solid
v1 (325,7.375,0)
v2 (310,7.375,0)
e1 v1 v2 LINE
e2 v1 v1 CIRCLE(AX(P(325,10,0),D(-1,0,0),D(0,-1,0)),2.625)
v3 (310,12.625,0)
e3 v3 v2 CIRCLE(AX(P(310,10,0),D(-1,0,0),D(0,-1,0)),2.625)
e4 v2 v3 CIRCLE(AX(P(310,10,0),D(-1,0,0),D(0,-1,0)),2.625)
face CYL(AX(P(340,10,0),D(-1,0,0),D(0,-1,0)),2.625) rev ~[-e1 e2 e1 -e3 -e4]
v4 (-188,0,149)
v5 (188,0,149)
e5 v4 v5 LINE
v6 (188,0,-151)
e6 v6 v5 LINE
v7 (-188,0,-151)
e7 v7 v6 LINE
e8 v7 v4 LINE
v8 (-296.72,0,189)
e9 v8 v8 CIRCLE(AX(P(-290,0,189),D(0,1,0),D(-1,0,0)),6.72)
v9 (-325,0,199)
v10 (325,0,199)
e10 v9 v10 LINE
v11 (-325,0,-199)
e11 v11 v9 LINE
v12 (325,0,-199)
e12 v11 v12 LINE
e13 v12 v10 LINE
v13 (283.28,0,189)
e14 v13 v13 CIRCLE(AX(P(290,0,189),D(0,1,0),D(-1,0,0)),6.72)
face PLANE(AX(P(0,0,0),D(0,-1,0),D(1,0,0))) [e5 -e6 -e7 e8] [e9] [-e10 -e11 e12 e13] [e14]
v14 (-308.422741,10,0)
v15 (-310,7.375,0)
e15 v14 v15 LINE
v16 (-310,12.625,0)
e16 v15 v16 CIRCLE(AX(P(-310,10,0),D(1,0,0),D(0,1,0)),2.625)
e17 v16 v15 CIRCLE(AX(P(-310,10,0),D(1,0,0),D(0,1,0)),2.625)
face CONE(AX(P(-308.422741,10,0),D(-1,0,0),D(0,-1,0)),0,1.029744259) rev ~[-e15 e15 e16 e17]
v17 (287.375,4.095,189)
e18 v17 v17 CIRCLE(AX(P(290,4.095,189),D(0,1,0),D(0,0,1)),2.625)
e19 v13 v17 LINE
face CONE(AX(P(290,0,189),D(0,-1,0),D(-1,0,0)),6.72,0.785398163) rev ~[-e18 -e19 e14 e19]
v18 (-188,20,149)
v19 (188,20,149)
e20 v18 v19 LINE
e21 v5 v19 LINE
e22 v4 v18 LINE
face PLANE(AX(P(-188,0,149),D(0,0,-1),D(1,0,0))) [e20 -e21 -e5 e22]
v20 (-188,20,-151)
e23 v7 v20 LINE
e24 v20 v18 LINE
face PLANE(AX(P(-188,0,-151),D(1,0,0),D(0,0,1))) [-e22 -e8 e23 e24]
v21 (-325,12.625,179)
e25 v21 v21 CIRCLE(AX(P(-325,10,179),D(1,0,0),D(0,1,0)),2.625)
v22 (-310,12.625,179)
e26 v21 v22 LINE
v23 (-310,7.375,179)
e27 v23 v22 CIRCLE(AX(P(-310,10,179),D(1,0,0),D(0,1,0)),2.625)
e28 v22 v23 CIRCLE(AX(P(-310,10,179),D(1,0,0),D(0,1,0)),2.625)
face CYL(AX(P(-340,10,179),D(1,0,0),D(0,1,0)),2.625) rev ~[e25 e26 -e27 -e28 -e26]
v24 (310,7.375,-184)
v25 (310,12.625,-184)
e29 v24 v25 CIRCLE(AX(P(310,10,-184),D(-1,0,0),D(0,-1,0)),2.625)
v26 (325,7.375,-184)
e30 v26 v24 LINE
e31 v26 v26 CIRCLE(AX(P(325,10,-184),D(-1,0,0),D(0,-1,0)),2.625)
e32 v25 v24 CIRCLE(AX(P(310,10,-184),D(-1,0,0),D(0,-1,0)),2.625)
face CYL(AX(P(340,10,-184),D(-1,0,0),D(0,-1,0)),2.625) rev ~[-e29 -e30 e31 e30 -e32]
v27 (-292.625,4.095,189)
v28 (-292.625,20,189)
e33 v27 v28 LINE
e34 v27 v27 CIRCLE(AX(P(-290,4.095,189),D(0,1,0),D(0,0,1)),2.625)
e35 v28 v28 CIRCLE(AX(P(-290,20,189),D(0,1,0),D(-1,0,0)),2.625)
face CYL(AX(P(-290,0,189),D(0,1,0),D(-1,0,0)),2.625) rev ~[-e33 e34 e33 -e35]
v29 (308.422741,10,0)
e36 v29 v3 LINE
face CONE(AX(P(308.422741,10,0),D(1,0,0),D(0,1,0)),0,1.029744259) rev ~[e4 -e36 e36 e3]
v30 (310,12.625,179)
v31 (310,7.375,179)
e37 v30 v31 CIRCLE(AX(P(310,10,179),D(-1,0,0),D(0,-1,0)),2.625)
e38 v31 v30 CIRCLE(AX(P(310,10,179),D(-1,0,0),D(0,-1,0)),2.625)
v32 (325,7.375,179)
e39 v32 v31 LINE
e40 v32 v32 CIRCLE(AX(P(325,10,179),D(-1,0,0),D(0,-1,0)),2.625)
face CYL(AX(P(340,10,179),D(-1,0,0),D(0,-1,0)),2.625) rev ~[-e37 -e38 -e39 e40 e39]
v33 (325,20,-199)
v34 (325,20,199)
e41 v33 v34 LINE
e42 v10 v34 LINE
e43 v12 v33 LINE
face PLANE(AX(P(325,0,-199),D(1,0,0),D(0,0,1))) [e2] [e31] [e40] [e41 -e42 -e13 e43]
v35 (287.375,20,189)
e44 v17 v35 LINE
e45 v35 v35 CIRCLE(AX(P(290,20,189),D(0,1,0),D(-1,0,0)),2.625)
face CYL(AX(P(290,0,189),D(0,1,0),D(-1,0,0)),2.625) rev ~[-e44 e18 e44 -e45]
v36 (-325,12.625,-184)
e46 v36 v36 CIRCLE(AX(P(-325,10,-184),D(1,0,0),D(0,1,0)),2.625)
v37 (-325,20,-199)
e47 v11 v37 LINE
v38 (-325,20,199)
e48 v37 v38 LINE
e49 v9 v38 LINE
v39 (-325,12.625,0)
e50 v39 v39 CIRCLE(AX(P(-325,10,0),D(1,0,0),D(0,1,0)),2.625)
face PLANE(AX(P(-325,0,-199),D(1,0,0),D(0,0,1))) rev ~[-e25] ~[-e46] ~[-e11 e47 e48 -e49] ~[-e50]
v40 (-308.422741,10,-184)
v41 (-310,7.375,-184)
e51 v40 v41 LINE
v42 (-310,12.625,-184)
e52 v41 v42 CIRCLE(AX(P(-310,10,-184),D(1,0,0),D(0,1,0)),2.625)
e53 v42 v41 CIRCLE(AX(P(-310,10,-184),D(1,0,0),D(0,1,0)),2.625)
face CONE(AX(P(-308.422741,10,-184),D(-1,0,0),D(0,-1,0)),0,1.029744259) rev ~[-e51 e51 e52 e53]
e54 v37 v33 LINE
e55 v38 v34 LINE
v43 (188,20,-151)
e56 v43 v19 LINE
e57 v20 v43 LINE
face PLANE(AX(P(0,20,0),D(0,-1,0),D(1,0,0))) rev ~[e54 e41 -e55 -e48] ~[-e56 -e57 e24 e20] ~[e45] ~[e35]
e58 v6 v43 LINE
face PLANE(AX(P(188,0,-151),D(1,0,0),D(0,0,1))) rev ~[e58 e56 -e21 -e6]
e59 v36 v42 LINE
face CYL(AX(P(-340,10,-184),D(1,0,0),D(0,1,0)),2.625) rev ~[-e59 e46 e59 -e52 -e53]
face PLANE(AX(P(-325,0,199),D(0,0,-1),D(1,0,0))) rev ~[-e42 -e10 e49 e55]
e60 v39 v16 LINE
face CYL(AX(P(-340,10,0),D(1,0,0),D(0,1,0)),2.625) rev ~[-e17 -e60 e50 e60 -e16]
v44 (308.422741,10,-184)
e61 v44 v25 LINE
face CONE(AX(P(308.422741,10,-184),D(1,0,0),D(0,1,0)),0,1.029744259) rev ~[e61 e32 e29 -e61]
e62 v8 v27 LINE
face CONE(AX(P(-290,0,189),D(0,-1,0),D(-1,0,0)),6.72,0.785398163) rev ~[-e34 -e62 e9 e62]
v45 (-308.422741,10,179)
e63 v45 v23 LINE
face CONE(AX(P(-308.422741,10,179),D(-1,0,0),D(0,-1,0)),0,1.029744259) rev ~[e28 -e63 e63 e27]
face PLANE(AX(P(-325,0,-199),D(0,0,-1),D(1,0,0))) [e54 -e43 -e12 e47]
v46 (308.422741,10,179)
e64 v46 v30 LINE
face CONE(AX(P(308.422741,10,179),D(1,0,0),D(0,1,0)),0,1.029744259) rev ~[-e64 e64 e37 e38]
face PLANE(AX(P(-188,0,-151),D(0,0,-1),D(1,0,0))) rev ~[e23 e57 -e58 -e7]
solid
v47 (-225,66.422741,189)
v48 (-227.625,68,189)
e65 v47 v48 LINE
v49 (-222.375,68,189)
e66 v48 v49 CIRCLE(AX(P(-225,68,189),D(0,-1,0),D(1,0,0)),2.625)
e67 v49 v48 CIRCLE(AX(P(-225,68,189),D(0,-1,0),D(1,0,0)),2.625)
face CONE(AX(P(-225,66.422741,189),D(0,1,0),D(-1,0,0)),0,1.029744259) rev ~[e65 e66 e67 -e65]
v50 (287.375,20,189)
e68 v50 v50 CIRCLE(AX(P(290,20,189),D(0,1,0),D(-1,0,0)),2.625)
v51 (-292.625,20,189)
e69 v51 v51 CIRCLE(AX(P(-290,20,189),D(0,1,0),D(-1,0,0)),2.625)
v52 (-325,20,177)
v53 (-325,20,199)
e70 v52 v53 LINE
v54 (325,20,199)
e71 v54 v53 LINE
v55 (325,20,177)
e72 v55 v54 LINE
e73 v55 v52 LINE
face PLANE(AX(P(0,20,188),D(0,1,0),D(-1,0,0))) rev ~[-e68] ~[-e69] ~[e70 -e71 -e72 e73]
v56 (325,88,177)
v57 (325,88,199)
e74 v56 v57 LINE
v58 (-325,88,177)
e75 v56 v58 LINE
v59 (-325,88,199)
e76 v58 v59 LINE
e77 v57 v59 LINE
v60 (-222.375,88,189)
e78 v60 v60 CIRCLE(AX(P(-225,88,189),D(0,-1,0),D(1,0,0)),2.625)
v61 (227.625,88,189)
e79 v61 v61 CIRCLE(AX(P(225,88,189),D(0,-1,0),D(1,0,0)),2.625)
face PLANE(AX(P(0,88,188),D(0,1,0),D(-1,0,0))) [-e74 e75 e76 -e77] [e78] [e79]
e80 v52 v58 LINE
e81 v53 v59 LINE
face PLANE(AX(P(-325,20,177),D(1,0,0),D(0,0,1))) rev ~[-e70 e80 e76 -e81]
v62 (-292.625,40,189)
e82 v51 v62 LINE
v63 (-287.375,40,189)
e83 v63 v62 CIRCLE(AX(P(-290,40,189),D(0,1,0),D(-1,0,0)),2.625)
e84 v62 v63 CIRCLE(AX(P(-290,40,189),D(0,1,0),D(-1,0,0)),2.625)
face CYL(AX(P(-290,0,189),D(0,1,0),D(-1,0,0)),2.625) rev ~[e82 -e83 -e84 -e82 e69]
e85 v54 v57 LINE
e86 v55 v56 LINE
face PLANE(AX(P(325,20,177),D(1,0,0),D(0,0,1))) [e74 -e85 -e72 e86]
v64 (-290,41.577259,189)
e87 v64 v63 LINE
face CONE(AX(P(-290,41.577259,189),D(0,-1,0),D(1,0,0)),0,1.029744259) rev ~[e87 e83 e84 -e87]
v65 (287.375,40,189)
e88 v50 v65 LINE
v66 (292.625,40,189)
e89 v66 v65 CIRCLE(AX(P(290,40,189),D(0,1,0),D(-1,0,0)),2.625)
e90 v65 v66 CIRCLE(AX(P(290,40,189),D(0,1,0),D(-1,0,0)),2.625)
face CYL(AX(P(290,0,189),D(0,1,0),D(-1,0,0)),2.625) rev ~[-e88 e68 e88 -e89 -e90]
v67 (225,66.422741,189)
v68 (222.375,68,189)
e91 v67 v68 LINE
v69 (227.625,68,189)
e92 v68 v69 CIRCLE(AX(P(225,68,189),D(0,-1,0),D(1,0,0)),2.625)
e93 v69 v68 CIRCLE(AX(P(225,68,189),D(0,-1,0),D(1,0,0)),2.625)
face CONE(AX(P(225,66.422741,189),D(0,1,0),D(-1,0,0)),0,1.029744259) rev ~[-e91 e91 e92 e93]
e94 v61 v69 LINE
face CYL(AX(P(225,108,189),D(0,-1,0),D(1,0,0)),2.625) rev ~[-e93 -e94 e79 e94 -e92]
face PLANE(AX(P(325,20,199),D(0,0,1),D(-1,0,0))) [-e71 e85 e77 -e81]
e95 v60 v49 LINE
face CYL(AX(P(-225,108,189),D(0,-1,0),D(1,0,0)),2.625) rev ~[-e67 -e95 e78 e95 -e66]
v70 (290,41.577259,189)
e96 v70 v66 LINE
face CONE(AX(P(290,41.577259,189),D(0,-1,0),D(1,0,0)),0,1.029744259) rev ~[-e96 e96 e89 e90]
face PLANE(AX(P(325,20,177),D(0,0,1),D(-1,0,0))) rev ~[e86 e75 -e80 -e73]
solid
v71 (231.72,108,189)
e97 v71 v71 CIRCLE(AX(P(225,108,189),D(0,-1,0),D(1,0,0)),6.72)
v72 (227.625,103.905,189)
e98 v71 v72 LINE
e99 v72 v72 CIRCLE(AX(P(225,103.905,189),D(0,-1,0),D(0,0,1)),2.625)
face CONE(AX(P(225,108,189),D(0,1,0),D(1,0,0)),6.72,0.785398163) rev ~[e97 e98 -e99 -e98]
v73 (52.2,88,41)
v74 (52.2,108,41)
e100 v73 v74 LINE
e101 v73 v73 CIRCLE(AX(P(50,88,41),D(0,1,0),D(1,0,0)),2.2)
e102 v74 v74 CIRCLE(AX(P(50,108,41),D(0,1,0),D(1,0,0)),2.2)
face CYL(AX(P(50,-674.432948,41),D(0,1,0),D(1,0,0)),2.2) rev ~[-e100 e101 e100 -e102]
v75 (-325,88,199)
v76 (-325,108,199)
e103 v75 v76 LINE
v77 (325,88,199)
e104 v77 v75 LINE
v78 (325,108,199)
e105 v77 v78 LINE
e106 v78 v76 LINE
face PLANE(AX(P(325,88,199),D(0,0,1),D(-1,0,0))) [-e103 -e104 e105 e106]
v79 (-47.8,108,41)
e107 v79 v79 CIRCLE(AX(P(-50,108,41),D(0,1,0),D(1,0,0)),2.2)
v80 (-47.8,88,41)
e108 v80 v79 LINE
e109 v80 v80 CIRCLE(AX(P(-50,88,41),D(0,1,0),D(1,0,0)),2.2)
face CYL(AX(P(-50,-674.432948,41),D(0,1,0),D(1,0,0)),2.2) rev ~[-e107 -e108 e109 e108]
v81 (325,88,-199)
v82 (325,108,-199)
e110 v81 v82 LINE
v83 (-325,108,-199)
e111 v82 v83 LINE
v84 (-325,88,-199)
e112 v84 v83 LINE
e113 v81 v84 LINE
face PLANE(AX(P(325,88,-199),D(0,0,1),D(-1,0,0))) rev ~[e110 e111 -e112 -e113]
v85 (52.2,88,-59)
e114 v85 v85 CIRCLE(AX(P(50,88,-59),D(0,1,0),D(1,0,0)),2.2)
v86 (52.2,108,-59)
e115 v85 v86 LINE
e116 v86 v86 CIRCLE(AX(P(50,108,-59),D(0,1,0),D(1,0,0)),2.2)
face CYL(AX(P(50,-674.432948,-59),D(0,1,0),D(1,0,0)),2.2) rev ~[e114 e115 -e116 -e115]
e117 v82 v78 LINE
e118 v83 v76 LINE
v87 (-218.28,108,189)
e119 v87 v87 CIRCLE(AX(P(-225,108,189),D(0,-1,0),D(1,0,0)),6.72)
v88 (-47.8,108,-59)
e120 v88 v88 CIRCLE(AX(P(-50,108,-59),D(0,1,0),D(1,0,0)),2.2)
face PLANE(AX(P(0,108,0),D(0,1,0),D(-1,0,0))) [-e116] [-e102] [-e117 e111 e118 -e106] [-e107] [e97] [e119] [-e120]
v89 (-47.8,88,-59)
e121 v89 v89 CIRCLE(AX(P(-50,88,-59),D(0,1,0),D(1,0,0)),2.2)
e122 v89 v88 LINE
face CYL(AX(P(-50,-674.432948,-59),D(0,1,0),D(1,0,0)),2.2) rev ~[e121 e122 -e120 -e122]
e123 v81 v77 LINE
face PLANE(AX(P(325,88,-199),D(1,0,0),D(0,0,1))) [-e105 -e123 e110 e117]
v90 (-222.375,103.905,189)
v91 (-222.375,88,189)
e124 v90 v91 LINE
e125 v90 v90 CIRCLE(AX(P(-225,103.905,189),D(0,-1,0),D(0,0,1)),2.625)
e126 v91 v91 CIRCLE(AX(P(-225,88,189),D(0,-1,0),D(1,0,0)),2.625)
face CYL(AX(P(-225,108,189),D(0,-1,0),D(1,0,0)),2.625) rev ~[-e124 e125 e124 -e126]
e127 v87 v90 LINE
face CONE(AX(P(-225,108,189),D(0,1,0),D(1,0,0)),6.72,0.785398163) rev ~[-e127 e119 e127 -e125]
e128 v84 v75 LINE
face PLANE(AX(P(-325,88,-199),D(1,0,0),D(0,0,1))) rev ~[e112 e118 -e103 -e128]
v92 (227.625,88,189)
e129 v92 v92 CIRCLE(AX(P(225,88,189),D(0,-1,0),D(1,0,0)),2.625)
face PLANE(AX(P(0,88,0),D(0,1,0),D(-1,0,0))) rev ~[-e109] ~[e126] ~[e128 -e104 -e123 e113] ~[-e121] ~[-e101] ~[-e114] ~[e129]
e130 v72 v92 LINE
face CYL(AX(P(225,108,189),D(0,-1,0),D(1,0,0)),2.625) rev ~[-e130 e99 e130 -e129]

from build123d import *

# Parameters (mm, degrees)
F0_W                    = 650
F0_H                    = 398
F0_W_2                  = 376
F0_H_2                  = 300
F1_DEPTH                = 20
F4_D                    = 5.25
F4_DEPTH                = 15
F4_TIP                  = 1.5772591249
F4_ON_F3_D              = 5.25
F4_ON_F3_DEPTH          = 15
F4_ON_F3_TIP            = 1.5772591249
F5_W                    = 650
F5_H                    = 22
F6_DEPTH                = 68
F7_W                    = 650
F7_H                    = 398
F7_W_2                  = 100
F7_H_2                  = 100
F8_DEPTH                = 20
F10_D                   = 5.25
F10_DEPTH               = 40
F10_CSINK_D             = 13.44
F10_CSINK_ANGLE         = 90
F10_TIP                 = 1.5772591249
F10_2_D                 = 5.25
F10_2_DEPTH             = 40
F10_2_CSINK_D           = 13.44
F10_2_CSINK_ANGLE       = 90
F10_2_TIP               = 1.5772591249
F10_ON_F9_D             = 5.25
F10_ON_F9_DEPTH         = 40
F10_ON_F9_CSINK_D       = 13.44
F10_ON_F9_CSINK_ANGLE   = 90
F10_ON_F9_TIP           = 1.5772591249
F10_ON_F9_2_D           = 5.25
F10_ON_F9_2_DEPTH       = 40
F10_ON_F9_2_CSINK_D     = 13.44
F10_ON_F9_2_CSINK_ANGLE = 90
F10_ON_F9_2_TIP         = 1.5772591249
F11_D                   = 4.4


# Not quite as in the source:
# - a feature names something its author has since deleted; it is built from what else it names


with BuildPart() as f1:
    # F0 (on Front) → F1 (new body)
    with BuildSketch(Plane.XZ):
        Rectangle(F0_W, F0_H)
        with Locations((0, -1)):
            Rectangle(F0_W_2, F0_H_2, mode=Mode.SUBTRACT)
    extrude(amount=-F1_DEPTH)

    # F4
    with Locations(Plane(origin=(-325, 0, 0), x_dir=(0, -1, 0), z_dir=(-1, 0, 0))):
        with Locations((-10, 179), (-10, 0), (-10, -184)):
            Hole(F4_D / 2, depth=F4_DEPTH)
            with Locations((0, 0, -(F4_DEPTH + F4_TIP / 2))):  # 118° drill point
                Cone(0, F4_D / 2, F4_TIP, mode=Mode.SUBTRACT)

    # F4 on F3
    with Locations(Plane.YZ.offset(325)):
        with Locations((10, 179), (10, 0), (10, -184)):
            Hole(F4_ON_F3_D / 2, depth=F4_ON_F3_DEPTH)
            with Locations((0, 0, -(F4_ON_F3_DEPTH + F4_ON_F3_TIP / 2))):  # 118° drill point
                Cone(0, F4_ON_F3_D / 2, F4_ON_F3_TIP, mode=Mode.SUBTRACT)

    # F10
    with Locations(Plane.XZ):
        with Locations((-290, 189), (290, 189)):
            CounterSinkHole(F10_D / 2, F10_CSINK_D / 2, depth=F10_DEPTH, counter_sink_angle=F10_CSINK_ANGLE)
            with Locations((0, 0, -(F10_DEPTH + F10_TIP / 2))):  # 118° drill point
                Cone(0, F10_D / 2, F10_TIP, mode=Mode.SUBTRACT)


with BuildPart() as f6:
    # F5 (on face) → F6 (new body)
    with BuildSketch(Plane(origin=(0, 20, 0), x_dir=(-1, 0, 0), z_dir=(0, 1, 0))):
        with Locations((0, 188)):
            Rectangle(F5_W, F5_H)
    extrude(amount=F6_DEPTH)

    # F10#2
    with Locations(Plane.XZ):
        with Locations((-290, 189), (290, 189)):
            CounterSinkHole(F10_2_D / 2, F10_2_CSINK_D / 2, depth=F10_2_DEPTH, counter_sink_angle=F10_2_CSINK_ANGLE)
            with Locations((0, 0, -(F10_2_DEPTH + F10_2_TIP / 2))):  # 118° drill point
                Cone(0, F10_2_D / 2, F10_2_TIP, mode=Mode.SUBTRACT)

    # F10 on F9
    with Locations(Plane(origin=(0, 108, 0), x_dir=(-1, 0, 0), z_dir=(0, 1, 0))):
        with Locations((-225, 189), (225, 189)):
            CounterSinkHole(F10_ON_F9_D / 2, F10_ON_F9_CSINK_D / 2, depth=F10_ON_F9_DEPTH, counter_sink_angle=F10_ON_F9_CSINK_ANGLE)
            with Locations((0, 0, -(F10_ON_F9_DEPTH + F10_ON_F9_TIP / 2))):  # 118° drill point
                Cone(0, F10_ON_F9_D / 2, F10_ON_F9_TIP, mode=Mode.SUBTRACT)


with BuildPart() as f8:
    # F7 (on face) → F8 (new body)
    with BuildSketch(Plane(origin=(0, 88, 0), x_dir=(-1, 0, 0), z_dir=(0, 1, 0))):
        Rectangle(F7_W, F7_H)
        with Locations((0, -9)):
            Rectangle(F7_W_2, F7_H_2, mode=Mode.SUBTRACT)
        with Locations((0, -9)):
            Rectangle(F7_W_2, F7_H_2)
    extrude(amount=F8_DEPTH)

    # F10 on F9#2
    with Locations(Plane(origin=(0, 108, 0), x_dir=(-1, 0, 0), z_dir=(0, 1, 0))):
        with Locations((-225, 189), (225, 189)):
            CounterSinkHole(F10_ON_F9_2_D / 2, F10_ON_F9_2_CSINK_D / 2, depth=F10_ON_F9_2_DEPTH, counter_sink_angle=F10_ON_F9_2_CSINK_ANGLE)
            with Locations((0, 0, -(F10_ON_F9_2_DEPTH + F10_ON_F9_2_TIP / 2))):  # 118° drill point
                Cone(0, F10_ON_F9_2_D / 2, F10_ON_F9_2_TIP, mode=Mode.SUBTRACT)

    # F11 (through all)
    with Locations(Plane(origin=(0, 88, 0), x_dir=(-1, 0, 0), z_dir=(0, -1, 0))):
        with Locations((-50, -41), (50, -41), (50, 59), (-50, 59)):
            Hole(F11_D / 2)


solid = Compound([f1.part, f6.part, f8.part])
